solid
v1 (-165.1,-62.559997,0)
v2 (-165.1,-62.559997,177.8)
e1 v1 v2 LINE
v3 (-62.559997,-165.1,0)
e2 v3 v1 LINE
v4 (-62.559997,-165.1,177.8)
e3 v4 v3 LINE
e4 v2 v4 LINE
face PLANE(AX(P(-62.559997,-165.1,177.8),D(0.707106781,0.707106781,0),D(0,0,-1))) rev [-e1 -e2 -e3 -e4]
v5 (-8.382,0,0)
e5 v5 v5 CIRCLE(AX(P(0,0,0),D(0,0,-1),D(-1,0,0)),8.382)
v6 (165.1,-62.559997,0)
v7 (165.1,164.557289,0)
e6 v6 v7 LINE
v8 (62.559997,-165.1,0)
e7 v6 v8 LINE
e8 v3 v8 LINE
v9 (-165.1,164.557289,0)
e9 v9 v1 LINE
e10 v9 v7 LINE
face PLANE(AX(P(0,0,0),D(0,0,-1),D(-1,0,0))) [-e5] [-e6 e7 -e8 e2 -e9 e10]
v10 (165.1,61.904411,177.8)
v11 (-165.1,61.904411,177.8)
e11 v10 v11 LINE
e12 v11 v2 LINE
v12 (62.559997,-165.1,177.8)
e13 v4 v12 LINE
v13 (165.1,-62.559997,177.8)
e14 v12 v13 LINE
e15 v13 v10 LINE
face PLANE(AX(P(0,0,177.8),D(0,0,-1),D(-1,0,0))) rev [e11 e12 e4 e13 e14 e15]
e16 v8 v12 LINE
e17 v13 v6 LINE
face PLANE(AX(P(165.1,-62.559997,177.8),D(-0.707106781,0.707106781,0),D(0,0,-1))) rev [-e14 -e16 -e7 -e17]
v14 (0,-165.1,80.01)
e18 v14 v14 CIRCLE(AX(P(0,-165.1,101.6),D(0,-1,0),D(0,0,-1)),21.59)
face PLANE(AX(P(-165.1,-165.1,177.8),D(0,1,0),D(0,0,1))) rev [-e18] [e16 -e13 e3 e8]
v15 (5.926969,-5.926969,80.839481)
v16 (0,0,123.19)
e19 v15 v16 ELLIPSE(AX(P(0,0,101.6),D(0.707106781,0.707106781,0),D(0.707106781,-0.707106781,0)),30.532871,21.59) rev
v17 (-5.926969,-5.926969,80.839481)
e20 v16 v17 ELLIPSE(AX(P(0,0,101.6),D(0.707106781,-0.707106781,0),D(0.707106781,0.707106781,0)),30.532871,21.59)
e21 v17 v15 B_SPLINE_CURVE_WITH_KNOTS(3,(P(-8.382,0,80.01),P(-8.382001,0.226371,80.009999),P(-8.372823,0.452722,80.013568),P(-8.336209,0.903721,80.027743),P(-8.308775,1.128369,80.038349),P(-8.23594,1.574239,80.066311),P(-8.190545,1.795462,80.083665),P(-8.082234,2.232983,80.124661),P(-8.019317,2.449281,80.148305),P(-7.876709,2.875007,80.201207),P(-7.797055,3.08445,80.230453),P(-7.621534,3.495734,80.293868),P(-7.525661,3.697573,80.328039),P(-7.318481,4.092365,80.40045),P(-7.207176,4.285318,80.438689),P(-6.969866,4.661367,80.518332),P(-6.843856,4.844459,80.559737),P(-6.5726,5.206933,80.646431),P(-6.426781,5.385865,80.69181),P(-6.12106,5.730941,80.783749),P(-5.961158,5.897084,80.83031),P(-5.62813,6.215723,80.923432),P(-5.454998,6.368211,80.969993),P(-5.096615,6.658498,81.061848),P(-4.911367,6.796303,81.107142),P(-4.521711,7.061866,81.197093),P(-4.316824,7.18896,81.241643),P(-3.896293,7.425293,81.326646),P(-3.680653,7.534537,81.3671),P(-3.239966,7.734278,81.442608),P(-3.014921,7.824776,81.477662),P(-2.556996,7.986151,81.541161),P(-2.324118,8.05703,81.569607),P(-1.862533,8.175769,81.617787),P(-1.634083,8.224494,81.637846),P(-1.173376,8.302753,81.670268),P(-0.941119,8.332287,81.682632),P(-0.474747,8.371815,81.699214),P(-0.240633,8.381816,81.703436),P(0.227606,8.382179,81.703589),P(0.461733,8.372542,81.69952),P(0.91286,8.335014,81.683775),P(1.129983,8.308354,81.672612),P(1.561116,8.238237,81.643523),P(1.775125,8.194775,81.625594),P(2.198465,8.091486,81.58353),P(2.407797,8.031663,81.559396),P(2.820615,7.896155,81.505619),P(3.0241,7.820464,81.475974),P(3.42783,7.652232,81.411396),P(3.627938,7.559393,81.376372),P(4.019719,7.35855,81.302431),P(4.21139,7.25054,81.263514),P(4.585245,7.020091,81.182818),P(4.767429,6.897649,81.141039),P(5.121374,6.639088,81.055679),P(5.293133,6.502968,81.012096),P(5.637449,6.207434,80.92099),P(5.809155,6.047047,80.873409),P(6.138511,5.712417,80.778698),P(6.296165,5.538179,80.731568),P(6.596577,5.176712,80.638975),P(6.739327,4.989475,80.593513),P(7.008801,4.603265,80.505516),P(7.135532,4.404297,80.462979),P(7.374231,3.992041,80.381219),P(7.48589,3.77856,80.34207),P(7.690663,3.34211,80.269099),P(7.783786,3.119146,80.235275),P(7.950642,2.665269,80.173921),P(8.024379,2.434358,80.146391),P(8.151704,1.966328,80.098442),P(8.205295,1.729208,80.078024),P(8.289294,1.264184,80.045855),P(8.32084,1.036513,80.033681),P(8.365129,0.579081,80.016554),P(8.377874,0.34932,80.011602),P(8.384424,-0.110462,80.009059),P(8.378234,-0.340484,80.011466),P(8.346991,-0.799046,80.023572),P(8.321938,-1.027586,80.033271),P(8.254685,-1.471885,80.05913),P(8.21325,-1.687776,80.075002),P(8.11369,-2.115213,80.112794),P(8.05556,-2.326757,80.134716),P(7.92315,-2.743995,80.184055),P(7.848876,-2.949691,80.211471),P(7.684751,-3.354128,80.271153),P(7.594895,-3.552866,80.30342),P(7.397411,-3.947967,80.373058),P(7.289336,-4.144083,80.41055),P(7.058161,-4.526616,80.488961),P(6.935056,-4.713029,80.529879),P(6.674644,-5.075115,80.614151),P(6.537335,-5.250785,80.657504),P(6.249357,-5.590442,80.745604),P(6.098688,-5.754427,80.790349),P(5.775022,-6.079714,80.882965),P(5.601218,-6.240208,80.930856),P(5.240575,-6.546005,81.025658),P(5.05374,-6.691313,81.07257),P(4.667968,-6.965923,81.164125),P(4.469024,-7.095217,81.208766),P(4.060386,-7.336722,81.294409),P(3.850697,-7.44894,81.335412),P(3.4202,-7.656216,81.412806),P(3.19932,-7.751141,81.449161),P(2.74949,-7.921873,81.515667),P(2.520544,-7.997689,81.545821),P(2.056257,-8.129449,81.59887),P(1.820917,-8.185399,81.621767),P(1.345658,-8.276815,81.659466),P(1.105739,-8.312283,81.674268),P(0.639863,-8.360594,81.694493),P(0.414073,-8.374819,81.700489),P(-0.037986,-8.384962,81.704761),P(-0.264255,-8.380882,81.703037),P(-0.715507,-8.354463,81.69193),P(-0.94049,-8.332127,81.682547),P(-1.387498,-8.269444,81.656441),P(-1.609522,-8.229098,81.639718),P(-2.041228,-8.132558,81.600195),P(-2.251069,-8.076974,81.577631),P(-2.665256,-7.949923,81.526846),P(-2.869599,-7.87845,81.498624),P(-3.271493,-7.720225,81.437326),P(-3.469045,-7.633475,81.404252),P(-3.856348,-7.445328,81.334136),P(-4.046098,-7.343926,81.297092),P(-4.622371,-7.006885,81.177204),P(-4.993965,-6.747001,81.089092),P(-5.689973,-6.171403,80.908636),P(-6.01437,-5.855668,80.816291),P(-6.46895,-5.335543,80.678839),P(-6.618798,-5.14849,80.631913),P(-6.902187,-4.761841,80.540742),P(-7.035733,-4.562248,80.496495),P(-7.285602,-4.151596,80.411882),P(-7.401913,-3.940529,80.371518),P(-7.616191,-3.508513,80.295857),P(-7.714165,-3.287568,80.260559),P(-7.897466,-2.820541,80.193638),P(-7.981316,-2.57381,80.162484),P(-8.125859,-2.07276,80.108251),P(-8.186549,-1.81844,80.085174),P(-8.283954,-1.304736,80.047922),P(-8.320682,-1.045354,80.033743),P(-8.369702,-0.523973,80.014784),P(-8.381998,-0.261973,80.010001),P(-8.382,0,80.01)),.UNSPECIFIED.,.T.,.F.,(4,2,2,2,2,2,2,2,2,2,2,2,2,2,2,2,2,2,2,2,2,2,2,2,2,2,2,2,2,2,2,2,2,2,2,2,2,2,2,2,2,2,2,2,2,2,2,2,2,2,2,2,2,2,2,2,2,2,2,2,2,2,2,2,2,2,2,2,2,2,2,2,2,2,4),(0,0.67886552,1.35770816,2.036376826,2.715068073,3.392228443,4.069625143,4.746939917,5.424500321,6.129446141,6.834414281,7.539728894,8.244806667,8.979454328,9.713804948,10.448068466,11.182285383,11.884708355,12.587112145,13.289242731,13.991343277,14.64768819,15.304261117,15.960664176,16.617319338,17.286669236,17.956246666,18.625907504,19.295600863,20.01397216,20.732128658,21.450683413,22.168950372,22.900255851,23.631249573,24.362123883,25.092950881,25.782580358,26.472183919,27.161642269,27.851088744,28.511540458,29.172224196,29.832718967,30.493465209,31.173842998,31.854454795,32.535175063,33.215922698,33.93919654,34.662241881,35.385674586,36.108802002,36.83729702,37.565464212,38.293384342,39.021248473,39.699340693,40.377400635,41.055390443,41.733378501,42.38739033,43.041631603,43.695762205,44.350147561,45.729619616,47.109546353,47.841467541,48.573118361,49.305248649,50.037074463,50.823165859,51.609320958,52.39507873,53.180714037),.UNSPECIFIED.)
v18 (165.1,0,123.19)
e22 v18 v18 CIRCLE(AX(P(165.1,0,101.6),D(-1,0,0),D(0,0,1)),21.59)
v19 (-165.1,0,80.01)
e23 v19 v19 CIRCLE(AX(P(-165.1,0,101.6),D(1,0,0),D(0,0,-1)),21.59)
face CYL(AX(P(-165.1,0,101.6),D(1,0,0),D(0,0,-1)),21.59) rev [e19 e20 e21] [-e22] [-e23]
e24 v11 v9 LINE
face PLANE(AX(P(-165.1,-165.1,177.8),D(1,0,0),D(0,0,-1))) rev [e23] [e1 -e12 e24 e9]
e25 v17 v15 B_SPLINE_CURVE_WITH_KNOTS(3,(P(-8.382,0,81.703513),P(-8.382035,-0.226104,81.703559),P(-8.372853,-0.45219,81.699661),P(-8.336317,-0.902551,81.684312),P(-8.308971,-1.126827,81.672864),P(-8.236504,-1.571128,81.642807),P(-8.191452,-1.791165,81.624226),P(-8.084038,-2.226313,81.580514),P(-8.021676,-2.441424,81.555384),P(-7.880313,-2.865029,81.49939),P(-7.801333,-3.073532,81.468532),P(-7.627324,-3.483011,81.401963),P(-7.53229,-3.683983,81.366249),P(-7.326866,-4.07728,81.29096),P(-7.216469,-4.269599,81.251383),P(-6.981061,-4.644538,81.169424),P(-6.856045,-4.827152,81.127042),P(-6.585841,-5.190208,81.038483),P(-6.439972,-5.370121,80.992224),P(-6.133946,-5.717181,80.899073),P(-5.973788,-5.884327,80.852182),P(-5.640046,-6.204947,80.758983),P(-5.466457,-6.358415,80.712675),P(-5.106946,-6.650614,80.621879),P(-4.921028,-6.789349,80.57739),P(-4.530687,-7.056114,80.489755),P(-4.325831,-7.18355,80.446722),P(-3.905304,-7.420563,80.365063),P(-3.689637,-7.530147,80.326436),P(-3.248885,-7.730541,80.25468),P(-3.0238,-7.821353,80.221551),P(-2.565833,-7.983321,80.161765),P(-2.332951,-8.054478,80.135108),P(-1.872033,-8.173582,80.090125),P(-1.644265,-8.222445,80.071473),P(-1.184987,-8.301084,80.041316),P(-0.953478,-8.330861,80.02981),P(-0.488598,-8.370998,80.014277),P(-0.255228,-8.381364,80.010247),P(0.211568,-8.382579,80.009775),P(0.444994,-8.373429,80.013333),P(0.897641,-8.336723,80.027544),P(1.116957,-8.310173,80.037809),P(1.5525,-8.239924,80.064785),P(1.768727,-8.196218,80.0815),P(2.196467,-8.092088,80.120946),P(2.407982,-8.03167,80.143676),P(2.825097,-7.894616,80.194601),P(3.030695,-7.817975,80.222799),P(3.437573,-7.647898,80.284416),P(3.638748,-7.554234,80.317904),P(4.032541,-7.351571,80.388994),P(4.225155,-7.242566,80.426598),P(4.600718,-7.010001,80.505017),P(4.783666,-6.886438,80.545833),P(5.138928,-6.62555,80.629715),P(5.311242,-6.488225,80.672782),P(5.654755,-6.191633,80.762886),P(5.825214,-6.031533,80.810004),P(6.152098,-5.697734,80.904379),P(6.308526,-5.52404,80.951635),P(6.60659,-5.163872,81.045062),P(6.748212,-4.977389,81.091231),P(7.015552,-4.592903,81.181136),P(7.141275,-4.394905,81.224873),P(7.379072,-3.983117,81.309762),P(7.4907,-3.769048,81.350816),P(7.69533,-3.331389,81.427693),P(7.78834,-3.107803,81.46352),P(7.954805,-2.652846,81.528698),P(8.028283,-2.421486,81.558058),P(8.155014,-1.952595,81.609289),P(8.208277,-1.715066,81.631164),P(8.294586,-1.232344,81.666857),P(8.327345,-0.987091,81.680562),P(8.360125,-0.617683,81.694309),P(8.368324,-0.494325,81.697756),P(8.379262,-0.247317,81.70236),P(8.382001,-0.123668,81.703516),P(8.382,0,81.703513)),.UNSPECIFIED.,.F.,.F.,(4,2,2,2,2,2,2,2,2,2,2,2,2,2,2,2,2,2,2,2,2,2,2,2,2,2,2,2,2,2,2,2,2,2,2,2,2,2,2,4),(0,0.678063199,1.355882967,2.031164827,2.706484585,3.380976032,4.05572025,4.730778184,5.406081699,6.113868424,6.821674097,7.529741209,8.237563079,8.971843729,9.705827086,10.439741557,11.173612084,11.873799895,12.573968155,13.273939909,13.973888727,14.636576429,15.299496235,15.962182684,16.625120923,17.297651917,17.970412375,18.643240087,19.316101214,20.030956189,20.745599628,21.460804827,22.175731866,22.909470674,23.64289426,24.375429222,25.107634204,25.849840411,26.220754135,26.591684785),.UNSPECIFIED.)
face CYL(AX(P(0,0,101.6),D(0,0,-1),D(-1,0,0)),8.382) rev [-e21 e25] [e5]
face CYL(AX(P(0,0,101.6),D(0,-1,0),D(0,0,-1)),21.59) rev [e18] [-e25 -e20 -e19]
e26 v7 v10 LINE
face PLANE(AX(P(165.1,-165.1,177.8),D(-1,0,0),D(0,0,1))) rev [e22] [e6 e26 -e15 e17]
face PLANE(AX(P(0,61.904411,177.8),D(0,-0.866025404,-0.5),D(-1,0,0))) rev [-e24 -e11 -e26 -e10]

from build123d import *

# Parameters (mm, degrees)
SKETCH2_W               = 330.2
SKETCH2_H               = 330.2
BOSS_EXTRUDE1_DEPTH     = 177.8
CUT_EXTRUDE1_DEPTH      = 410.759551445
CUT_EXTRUDE1_DEPTH_BACK = 410.759551445
SKETCH3_R               = 21.59
SKETCH5_R               = 8.382
CUT_EXTRUDE3_DEPTH      = 101.6
SKETCH6_R               = 21.59
CUT_EXTRUDE4_DEPTH      = 165.1
CHAMFER6_SIZE           = 103.195588962
CHAMFER6_SIZE_2         = 178.7400032
CHAMFER7_SIZE           = 102.5400032


with BuildPart() as part:
    # Sketch2 → Boss-Extrude1 (new body)
    with BuildSketch(Plane.XY):
        Rectangle(SKETCH2_W, SKETCH2_H)
    extrude(amount=BOSS_EXTRUDE1_DEPTH)

    # Sketch3 → Cut-Extrude1 (cut, two sides: drawn at the far end of the back side and taken through both)
    with BuildSketch(Plane(origin=(165.1, 0, 0), x_dir=(0, 0, -1), z_dir=(1, 0, 0)).offset(-CUT_EXTRUDE1_DEPTH_BACK)):
        with Locations((-101.6, 0)):
            Circle(SKETCH3_R)
    extrude(amount=CUT_EXTRUDE1_DEPTH + CUT_EXTRUDE1_DEPTH_BACK, mode=Mode.SUBTRACT)

    # Sketch5 → Cut-Extrude3 (cut)
    with BuildSketch(Plane(origin=(0, 0, 0), x_dir=(-1, 0, 0), z_dir=(0, 0, -1))):
        Circle(SKETCH5_R)
    extrude(amount=-CUT_EXTRUDE3_DEPTH, mode=Mode.SUBTRACT)

    # Sketch6 → Cut-Extrude4 (cut)
    with BuildSketch(Plane.XZ.offset(165.1)):
        with Locations(Location((0, 101.6, 0), (0, 0, 270))):
            Circle(SKETCH6_R)
    extrude(amount=-CUT_EXTRUDE4_DEPTH, mode=Mode.SUBTRACT)

    # Chamfer6
    # the kernel refuses this chamfer: 178.7400032, 103.195588962 mm, written as the material it takes off along each edge
    with BuildSketch(Plane(origin=(627.515716064, 165.1, 177.8), x_dir=(0, -1, 0), z_dir=(-1, 0, 0))) as chamfer6_piece_1:
        Polygon((CHAMFER6_SIZE, 0), (0, -CHAMFER6_SIZE_2), (0, 0), align=None)
    extrude(amount=1255.031432128, mode=Mode.SUBTRACT)

    # Chamfer7
    chamfer7_edges = [part.edges().sort_by_distance(p)[0] for p in [
        (165.1, -165.1, 88.9),
        (-165.1, -165.1, 88.9),
    ]]
    chamfer(chamfer7_edges, length=CHAMFER7_SIZE)


solid = part.part
